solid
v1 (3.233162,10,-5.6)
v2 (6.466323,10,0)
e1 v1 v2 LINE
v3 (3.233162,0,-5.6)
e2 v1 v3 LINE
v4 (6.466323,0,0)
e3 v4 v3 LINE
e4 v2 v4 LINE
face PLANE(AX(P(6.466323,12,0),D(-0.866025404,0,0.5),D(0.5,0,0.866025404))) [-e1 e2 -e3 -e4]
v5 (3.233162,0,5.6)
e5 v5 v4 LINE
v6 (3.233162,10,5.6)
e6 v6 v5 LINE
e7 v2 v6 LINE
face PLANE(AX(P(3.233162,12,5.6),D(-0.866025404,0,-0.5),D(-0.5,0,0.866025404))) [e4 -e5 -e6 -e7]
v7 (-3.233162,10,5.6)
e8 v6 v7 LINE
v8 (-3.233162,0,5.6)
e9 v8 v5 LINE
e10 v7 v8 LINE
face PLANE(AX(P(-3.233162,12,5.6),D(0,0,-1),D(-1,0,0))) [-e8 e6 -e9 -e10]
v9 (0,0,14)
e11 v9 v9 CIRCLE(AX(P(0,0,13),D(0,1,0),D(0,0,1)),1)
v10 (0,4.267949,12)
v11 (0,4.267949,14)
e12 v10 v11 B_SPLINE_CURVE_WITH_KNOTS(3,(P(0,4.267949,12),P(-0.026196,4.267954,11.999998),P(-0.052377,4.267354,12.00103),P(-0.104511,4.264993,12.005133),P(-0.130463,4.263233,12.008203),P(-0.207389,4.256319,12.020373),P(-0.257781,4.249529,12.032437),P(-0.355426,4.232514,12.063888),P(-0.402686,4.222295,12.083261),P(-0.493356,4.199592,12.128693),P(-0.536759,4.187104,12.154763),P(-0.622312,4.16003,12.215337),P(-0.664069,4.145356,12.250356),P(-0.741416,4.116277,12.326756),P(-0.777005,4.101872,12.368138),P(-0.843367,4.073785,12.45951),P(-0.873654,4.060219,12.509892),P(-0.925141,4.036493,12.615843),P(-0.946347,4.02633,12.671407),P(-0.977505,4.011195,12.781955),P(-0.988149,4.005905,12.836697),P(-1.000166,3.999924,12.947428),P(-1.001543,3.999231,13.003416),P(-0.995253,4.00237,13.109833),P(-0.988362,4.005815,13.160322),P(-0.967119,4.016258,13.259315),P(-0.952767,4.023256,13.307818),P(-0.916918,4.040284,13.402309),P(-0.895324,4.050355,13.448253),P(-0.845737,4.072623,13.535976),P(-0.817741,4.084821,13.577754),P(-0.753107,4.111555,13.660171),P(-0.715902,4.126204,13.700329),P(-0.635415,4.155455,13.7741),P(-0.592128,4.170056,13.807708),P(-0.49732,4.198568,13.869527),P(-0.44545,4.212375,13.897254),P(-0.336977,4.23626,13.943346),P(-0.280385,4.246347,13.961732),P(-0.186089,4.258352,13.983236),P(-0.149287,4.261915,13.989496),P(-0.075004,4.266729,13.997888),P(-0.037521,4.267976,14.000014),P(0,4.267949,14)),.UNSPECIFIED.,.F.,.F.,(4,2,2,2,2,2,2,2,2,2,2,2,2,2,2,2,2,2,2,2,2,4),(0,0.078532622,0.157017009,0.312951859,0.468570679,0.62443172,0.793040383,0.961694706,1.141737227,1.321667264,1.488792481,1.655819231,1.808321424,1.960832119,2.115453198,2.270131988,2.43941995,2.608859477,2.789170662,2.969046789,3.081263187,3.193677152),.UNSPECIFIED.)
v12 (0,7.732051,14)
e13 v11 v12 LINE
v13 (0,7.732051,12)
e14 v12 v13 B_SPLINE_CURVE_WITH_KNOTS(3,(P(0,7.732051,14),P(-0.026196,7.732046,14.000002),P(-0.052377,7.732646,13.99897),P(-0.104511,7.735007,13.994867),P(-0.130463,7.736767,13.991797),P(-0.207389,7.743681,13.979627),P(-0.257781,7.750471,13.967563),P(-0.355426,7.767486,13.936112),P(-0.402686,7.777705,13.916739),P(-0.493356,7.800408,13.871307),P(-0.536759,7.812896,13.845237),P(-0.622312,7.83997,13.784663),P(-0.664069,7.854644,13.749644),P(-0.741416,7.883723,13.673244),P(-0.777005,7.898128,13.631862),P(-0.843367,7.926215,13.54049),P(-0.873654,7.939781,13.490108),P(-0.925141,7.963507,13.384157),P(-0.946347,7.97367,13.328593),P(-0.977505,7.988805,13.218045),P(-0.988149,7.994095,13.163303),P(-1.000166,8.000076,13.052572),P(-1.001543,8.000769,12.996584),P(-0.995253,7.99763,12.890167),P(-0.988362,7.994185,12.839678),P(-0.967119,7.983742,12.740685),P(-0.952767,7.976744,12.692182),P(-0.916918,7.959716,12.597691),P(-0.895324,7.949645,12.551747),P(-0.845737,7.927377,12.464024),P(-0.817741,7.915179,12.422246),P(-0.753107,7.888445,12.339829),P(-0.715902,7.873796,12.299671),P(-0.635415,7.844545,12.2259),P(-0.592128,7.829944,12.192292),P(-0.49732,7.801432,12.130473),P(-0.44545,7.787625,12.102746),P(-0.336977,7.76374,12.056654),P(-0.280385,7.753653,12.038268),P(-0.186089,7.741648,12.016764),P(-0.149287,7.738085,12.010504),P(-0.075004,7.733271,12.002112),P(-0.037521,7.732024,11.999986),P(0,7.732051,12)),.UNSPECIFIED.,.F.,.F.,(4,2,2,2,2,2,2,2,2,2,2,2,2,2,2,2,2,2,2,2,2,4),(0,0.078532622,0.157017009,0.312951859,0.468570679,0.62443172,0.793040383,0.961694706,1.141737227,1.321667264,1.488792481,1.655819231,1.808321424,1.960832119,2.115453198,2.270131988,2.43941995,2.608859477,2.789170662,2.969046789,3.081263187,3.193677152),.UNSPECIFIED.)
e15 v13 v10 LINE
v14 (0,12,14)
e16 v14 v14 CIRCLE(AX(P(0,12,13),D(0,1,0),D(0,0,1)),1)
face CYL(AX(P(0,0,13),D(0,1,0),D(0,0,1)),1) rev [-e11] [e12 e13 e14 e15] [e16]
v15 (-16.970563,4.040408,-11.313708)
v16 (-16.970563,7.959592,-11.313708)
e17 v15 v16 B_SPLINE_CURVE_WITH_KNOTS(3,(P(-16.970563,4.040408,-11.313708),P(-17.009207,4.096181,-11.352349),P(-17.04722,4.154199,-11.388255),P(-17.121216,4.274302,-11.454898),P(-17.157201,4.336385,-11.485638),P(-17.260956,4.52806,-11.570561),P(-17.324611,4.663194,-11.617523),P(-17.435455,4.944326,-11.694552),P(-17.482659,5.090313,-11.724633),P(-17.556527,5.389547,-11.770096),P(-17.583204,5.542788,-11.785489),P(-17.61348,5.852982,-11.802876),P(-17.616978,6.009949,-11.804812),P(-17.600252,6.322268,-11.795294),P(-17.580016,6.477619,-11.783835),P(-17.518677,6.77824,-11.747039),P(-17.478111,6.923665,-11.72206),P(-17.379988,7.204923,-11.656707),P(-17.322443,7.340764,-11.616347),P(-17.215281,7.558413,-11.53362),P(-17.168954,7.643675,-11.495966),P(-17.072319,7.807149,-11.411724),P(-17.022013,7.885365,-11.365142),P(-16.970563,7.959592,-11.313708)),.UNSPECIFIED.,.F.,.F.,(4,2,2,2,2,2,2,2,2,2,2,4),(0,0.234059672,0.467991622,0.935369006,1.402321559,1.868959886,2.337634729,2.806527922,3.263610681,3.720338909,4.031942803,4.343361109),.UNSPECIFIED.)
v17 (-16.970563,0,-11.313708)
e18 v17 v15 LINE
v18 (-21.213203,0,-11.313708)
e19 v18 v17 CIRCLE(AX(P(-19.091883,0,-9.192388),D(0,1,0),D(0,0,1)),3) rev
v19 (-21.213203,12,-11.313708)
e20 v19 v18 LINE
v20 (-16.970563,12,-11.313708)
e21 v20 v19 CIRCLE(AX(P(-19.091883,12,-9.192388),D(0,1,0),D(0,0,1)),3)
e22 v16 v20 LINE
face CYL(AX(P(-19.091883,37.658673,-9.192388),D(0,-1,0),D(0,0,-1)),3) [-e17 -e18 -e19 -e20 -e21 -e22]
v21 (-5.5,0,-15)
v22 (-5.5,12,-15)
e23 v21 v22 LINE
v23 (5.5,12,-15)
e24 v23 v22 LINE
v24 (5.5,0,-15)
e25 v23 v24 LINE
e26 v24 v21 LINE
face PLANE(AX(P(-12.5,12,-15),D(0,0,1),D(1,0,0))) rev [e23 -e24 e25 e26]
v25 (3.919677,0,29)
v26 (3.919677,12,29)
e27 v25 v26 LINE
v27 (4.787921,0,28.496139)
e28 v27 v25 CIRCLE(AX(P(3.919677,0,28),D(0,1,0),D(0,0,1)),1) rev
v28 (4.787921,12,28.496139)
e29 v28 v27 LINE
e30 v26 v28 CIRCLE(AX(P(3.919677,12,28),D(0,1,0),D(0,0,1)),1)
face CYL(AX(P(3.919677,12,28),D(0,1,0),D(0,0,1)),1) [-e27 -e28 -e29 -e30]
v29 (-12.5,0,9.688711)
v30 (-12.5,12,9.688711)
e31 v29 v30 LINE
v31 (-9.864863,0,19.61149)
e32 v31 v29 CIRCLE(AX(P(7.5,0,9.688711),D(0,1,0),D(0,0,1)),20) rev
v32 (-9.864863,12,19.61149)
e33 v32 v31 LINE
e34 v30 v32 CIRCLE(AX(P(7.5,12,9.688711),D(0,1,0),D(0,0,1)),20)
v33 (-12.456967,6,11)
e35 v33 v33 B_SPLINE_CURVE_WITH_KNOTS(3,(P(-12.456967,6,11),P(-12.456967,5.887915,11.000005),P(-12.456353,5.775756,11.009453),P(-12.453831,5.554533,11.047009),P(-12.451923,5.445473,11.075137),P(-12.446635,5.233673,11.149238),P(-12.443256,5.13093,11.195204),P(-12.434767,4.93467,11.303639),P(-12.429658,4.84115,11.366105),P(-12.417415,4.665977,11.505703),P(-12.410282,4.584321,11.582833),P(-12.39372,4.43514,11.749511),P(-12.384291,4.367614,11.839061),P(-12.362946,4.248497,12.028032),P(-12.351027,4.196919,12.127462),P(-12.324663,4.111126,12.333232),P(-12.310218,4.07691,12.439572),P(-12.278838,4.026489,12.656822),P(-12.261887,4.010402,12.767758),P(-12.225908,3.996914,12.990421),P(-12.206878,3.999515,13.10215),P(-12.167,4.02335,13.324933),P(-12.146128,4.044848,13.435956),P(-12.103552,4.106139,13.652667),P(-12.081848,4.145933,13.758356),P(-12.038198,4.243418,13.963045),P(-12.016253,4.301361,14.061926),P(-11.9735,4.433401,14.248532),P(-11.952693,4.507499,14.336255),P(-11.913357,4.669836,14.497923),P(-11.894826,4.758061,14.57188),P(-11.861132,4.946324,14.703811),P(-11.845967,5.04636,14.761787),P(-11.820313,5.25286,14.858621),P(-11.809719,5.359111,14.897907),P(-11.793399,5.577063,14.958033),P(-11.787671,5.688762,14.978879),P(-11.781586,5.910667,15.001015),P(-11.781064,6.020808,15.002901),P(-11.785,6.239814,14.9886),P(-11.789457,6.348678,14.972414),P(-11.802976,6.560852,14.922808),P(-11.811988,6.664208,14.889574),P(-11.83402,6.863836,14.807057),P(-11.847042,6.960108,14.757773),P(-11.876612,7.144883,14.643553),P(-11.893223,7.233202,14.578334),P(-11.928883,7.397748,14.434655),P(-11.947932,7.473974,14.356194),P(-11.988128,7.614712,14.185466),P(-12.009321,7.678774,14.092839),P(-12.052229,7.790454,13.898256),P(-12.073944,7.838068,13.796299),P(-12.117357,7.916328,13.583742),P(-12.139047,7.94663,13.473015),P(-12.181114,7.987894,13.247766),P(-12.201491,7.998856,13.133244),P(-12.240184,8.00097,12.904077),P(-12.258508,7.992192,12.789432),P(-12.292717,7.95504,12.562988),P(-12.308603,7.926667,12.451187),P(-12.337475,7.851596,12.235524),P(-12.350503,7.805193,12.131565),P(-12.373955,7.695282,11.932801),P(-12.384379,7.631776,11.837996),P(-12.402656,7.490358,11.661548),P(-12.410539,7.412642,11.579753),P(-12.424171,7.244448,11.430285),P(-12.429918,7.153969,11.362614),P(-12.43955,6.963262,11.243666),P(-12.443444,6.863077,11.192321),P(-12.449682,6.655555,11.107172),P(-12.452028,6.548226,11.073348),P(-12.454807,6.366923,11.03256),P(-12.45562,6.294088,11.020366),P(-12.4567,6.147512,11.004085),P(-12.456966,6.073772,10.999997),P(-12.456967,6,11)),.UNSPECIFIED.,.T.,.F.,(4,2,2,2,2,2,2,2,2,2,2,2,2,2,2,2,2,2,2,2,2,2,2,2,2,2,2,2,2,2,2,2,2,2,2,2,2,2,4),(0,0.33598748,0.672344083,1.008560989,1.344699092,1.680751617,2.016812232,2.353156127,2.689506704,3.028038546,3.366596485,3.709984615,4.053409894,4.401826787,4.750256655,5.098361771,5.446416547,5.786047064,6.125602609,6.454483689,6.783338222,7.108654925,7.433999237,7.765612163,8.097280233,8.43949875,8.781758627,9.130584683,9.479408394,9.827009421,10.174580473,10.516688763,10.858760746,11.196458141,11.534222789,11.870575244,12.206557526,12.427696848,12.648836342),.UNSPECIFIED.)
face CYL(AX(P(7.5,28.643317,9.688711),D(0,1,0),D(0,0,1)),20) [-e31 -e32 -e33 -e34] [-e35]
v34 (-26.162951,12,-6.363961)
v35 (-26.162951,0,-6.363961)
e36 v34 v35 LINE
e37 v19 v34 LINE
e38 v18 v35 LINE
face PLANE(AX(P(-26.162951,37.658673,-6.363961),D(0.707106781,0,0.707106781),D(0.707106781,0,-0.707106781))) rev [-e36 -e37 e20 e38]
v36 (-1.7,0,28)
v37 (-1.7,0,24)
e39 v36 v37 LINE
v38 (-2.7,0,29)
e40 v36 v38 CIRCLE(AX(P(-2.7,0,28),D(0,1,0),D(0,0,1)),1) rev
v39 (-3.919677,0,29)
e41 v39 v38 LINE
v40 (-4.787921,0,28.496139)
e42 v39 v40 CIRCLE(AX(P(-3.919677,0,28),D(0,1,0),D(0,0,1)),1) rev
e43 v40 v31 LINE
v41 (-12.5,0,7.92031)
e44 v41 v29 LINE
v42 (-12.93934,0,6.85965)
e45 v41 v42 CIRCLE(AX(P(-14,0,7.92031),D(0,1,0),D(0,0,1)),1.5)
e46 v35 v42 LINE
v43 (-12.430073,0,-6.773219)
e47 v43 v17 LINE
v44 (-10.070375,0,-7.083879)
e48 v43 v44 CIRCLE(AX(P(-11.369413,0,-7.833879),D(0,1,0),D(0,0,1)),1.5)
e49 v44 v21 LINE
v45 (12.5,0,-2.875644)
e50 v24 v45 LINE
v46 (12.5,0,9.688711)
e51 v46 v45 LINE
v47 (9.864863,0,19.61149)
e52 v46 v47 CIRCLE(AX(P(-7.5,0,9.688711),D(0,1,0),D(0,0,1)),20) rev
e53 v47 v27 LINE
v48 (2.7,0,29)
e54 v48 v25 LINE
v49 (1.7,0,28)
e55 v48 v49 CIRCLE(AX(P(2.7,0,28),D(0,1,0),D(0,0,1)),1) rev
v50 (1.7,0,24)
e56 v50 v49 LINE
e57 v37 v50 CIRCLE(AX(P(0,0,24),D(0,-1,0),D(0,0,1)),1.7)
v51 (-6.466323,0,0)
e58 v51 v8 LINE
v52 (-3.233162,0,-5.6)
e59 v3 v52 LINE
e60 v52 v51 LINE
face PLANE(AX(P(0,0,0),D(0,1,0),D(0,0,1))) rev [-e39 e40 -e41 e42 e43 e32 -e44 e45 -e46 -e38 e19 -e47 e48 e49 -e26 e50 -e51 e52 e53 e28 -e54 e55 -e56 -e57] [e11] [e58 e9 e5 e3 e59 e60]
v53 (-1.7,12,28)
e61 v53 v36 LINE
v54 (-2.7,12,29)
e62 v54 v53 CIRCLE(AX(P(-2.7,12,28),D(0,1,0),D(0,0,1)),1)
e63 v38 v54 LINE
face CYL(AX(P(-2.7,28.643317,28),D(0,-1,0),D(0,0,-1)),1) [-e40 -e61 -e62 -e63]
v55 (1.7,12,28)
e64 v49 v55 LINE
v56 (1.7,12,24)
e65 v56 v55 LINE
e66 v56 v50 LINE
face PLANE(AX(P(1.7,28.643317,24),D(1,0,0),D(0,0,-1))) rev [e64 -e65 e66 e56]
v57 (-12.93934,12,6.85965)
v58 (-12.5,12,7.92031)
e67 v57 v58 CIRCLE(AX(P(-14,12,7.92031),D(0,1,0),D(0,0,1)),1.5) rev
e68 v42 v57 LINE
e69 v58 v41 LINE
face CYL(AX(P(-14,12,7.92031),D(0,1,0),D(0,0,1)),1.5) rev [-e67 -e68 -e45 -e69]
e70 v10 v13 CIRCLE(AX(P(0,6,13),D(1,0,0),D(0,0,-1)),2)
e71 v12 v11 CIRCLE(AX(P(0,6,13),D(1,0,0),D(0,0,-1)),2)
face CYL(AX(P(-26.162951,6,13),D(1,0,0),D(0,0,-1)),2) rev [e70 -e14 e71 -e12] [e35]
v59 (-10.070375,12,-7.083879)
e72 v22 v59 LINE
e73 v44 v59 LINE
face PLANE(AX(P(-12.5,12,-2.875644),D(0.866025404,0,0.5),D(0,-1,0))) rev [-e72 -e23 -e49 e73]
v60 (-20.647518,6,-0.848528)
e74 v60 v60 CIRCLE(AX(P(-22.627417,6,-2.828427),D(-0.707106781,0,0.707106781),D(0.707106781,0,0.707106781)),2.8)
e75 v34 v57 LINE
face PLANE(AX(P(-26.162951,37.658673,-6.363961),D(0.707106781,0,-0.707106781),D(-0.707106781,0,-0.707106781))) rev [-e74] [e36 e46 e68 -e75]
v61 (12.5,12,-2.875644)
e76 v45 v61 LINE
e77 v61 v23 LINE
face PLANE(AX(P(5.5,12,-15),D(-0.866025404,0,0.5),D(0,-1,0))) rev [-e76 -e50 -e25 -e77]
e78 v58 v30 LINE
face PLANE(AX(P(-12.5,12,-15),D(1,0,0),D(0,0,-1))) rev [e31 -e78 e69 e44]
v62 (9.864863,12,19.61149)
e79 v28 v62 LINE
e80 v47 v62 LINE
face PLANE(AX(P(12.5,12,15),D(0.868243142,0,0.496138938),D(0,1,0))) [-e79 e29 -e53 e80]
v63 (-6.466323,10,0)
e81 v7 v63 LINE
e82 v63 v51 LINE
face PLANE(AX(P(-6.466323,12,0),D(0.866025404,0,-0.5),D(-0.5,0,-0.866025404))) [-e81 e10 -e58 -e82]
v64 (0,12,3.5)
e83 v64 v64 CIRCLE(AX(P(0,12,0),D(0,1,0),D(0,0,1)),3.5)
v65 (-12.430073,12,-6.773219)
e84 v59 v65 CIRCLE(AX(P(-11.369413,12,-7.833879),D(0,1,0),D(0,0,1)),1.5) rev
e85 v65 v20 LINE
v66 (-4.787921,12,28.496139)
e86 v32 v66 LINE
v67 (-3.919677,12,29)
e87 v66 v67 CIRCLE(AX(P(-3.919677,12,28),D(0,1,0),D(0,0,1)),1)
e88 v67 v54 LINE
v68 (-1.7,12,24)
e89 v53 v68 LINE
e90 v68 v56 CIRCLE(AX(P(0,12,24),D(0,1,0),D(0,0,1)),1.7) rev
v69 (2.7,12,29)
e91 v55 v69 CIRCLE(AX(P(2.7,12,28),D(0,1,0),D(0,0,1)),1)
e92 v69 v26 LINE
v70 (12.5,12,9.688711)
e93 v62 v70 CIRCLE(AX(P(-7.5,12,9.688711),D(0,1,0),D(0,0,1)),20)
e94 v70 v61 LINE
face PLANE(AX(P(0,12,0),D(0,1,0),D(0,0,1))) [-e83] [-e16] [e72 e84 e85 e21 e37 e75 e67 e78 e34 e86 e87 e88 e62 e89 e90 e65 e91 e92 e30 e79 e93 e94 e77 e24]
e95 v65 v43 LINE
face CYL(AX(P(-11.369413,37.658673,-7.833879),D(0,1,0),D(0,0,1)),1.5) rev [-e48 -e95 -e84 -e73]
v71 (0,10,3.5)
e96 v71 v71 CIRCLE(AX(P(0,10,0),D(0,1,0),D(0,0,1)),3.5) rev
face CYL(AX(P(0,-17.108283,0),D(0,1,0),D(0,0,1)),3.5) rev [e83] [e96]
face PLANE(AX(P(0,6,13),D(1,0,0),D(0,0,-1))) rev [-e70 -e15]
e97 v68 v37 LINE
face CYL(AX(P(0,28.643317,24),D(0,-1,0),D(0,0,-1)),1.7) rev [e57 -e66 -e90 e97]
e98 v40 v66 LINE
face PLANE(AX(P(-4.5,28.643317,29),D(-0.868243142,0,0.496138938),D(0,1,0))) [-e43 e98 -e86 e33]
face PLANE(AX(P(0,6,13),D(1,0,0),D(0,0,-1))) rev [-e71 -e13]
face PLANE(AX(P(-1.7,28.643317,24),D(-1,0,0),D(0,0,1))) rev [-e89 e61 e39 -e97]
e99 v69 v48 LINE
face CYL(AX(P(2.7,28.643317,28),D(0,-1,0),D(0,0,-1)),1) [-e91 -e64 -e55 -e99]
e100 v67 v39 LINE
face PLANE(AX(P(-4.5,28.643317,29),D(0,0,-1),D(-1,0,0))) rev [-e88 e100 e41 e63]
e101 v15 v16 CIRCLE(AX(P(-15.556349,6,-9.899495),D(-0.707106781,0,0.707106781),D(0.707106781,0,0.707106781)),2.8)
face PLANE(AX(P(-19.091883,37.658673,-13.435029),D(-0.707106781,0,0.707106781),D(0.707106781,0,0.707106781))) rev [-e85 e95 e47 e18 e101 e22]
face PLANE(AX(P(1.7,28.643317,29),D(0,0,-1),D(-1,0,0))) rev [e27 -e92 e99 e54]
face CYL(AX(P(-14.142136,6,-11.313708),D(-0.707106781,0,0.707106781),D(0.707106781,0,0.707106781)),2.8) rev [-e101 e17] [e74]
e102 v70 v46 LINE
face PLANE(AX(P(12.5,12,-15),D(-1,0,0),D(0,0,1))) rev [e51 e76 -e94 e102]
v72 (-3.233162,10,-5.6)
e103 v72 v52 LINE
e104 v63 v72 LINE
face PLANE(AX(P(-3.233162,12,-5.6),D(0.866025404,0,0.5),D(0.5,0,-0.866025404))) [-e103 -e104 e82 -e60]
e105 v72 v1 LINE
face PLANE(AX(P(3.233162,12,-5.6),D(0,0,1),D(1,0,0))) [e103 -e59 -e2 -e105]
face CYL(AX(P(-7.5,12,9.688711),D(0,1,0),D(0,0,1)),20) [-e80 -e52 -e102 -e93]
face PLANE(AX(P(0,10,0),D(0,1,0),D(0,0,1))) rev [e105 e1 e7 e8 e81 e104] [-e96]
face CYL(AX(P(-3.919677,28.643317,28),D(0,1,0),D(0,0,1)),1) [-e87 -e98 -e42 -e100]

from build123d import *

# Parameters (mm, degrees)
SKETCH1_W           = 25
SKETCH1_H           = 30
BOSS_EXTRUDE1_DEPTH = 12
BOSS_EXTRUDE6_DEPTH = 12
CHAMFER1_SIZE       = 7
CHAMFER1_SIZE2      = 12.124355653
BOSS_EXTRUDE4_DEPTH = 12
SKETCH7_R           = 2.8
CUT_EXTRUDE2_DEPTH  = 12
CHAMFER2_SIZE       = 8
CHAMFER2_SIZE_2     = 14
CHAMFER3_SIZE       = 14
CHAMFER3_SIZE_2     = 8
FILLET2_R           = 20
FILLET3_R           = 1
FILLET4_R           = 1.5
SKETCH10_R          = 1
CUT_EXTRUDE3_DEPTH  = 41.859515416
SKETCH11_R          = 2
CUT_EXTRUDE4_DEPTH  = 41.859515416
SKETCH12_R          = 3.5
BOSS_EXTRUDE8_DEPTH = 2
FILLET5_R           = 3


with BuildPart() as part:
    # Sketch1 → Boss-Extrude1 (new body)
    with BuildSketch(Plane(origin=(0, 0, 0), x_dir=(1, 0, 0), z_dir=(0, 1, 0))):
        Rectangle(SKETCH1_W, SKETCH1_H)
        Polygon((3.233161507, -5.6), (6.466323015, 0), (3.233161507, 5.6), (-3.233161507, 5.6), (-6.466323015, 0), (-3.233161507, -5.6), align=None, mode=Mode.SUBTRACT)
    extrude(amount=BOSS_EXTRUDE1_DEPTH)

    # Sketch8 → Boss-Extrude6 (add)
    with BuildSketch(Plane(origin=(0, 0, 0), x_dir=(1, 0, 0), z_dir=(0, 1, 0))):
        with BuildLine():
            Line((-4.5, -15), (4.5, -15))
            Line((4.5, -15), (4.5, -29))
            Line((4.5, -29), (1.7, -29))
            Line((1.7, -29), (1.7, -24))
            ThreePointArc((1.7, -24), (0, -22.3), (-1.7, -24))
            Line((-1.7, -24), (-1.7, -29))
            Line((-1.7, -29), (-4.5, -29))
            Line((-4.5, -29), (-4.5, -15))
        make_face()
    extrude(amount=BOSS_EXTRUDE6_DEPTH)

    # Chamfer1
    chamfer1_edges = [part.edges().sort_by_distance(p)[0] for p in [
        (-12.5, 6, -15),
        (12.5, 6, -15),
    ]]
    chamfer1_side = [part.faces().sort_by_distance(p)[0] for p in [
        (0, 6, -15),
    ]]
    chamfer(chamfer1_edges, length=CHAMFER1_SIZE, length2=CHAMFER1_SIZE2, reference=chamfer1_side[0])

    # Sketch6 → Boss-Extrude4 (add)
    with BuildSketch(Plane(origin=(0, 0, 0), x_dir=(1, 0, 0), z_dir=(0, 1, 0))):
        Polygon((-26.162950904, 6.363961031), (-12.5, -7.298989873), (-12.5, 2.875644347), (-11.047793697, 5.390939447), (-19.091883092, 13.435028843), align=None)
    extrude(amount=BOSS_EXTRUDE4_DEPTH)

    # Sketch7 → Cut-Extrude2 (cut)
    with BuildSketch(Plane(origin=(-9.899494937, 0, 9.899494937), x_dir=(0.7071067811865438, 0, 0.7071067811865512), z_dir=(-0.7071067811865512, 0, 0.7071067811865438))):
        with Locations((-18, 6)):
            Circle(SKETCH7_R)
    extrude(amount=-CUT_EXTRUDE2_DEPTH, mode=Mode.SUBTRACT)

    # Chamfer2
    # the kernel refuses this chamfer: 14, 8 mm, written as the material it adds along each edge
    with BuildSketch(Plane(origin=(4.5, 0, 15), x_dir=(0.9982794274996464, 0, -0.05863603525971087), z_dir=(0, 1, 0))) as chamfer2_piece_1:
        Polygon((CHAMFER2_SIZE * 0.9982794275, -CHAMFER2_SIZE * 0.0586360352597), (-CHAMFER2_SIZE_2 * 0.0586360352597, -CHAMFER2_SIZE_2 * 0.9982794275), (0, 0), align=None)
    extrude(amount=12)

    # Chamfer3
    # the kernel refuses this chamfer: 14, 8 mm, written as the material it adds along each edge
    with BuildSketch(Plane(origin=(-4.5, 0, 15), x_dir=(0.019175933519162247, 0, 0.9998161248818048), z_dir=(0, 1, 0))) as chamfer3_piece_1:
        Polygon((CHAMFER3_SIZE * 0.999816124882, -CHAMFER3_SIZE * 0.0191759335192), (-CHAMFER3_SIZE_2 * 0.0191759335192, -CHAMFER3_SIZE_2 * 0.999816124882), (0, 0), align=None)
    extrude(amount=12)

    # Fillet2
    fillet2_edges = [part.edges().sort_by_distance(p)[0] for p in [
        (12.5, 6, 15),
        (-12.5, 6, 15),
    ]]
    fillet(fillet2_edges, radius=FILLET2_R)

    # Fillet3
    fillet3_edges = [part.edges().sort_by_distance(p)[0] for p in [
        (-4.5, 6, 29),
        (-1.7, 6, 29),
        (1.7, 6, 29),
        (4.5, 6, 29),
    ]]
    fillet(fillet3_edges, radius=FILLET3_R)

    # Fillet4
    fillet4_edges = [part.edges().sort_by_distance(p)[0] for p in [
        (-12.5, 6, 7.298989873),
        (-11.047793697, 6, -5.390939447),
    ]]
    fillet(fillet4_edges, radius=FILLET4_R)

    # Sketch10 → Cut-Extrude3 (cut, through all)
    with BuildSketch(Plane(origin=(0, 12, 0), x_dir=(1, 0, 0), z_dir=(0, 1, 0))):
        with Locations(Location((0, -13, 0), (0, 0, 270))):
            Circle(SKETCH10_R)
    extrude(amount=-CUT_EXTRUDE3_DEPTH, mode=Mode.SUBTRACT)

    # Sketch11 → Cut-Extrude4 (cut, through all)
    with BuildSketch(Plane(origin=(0, 0, 0), x_dir=(0, 0, -1), z_dir=(1, 0, 0))):
        with Locations((-13, 6)):
            Circle(SKETCH11_R)
    extrude(amount=-CUT_EXTRUDE4_DEPTH, mode=Mode.SUBTRACT)

    # Sketch12 → Boss-Extrude8 (add)
    with BuildSketch(Plane(origin=(0, 12, 0), x_dir=(1, 0, 0), z_dir=(0, 1, 0))):
        Polygon((3.233161507, 5.6), (-3.233161507, 5.6), (-6.466323015, 0), (-3.233161507, -5.6), (3.233161507, -5.6), (6.466323015, 0), align=None)
        with Locations(Location((0, 0, 0), (0, 0, 270))):
            Circle(SKETCH12_R, mode=Mode.SUBTRACT)
    extrude(amount=-BOSS_EXTRUDE8_DEPTH)

    # Fillet5
    # the kernel refuses this fillet: 3 mm, written as the material it takes off along each edge
    with BuildSketch(Plane(origin=(-19.091883092, -7.5, -13.435028843), x_dir=(-0.7071067811865517, 0, 0.7071067811865434), z_dir=(0, 1, 0))) as fillet5_piece_1:
        with BuildLine():
            CenterArc((FILLET5_R, FILLET5_R), FILLET5_R, 180, 90)
            Line((0, FILLET5_R), (0, 0))
            Line((0, 0), (FILLET5_R, 0))
        make_face()
    extrude(amount=27, mode=Mode.SUBTRACT)


solid = part.part
